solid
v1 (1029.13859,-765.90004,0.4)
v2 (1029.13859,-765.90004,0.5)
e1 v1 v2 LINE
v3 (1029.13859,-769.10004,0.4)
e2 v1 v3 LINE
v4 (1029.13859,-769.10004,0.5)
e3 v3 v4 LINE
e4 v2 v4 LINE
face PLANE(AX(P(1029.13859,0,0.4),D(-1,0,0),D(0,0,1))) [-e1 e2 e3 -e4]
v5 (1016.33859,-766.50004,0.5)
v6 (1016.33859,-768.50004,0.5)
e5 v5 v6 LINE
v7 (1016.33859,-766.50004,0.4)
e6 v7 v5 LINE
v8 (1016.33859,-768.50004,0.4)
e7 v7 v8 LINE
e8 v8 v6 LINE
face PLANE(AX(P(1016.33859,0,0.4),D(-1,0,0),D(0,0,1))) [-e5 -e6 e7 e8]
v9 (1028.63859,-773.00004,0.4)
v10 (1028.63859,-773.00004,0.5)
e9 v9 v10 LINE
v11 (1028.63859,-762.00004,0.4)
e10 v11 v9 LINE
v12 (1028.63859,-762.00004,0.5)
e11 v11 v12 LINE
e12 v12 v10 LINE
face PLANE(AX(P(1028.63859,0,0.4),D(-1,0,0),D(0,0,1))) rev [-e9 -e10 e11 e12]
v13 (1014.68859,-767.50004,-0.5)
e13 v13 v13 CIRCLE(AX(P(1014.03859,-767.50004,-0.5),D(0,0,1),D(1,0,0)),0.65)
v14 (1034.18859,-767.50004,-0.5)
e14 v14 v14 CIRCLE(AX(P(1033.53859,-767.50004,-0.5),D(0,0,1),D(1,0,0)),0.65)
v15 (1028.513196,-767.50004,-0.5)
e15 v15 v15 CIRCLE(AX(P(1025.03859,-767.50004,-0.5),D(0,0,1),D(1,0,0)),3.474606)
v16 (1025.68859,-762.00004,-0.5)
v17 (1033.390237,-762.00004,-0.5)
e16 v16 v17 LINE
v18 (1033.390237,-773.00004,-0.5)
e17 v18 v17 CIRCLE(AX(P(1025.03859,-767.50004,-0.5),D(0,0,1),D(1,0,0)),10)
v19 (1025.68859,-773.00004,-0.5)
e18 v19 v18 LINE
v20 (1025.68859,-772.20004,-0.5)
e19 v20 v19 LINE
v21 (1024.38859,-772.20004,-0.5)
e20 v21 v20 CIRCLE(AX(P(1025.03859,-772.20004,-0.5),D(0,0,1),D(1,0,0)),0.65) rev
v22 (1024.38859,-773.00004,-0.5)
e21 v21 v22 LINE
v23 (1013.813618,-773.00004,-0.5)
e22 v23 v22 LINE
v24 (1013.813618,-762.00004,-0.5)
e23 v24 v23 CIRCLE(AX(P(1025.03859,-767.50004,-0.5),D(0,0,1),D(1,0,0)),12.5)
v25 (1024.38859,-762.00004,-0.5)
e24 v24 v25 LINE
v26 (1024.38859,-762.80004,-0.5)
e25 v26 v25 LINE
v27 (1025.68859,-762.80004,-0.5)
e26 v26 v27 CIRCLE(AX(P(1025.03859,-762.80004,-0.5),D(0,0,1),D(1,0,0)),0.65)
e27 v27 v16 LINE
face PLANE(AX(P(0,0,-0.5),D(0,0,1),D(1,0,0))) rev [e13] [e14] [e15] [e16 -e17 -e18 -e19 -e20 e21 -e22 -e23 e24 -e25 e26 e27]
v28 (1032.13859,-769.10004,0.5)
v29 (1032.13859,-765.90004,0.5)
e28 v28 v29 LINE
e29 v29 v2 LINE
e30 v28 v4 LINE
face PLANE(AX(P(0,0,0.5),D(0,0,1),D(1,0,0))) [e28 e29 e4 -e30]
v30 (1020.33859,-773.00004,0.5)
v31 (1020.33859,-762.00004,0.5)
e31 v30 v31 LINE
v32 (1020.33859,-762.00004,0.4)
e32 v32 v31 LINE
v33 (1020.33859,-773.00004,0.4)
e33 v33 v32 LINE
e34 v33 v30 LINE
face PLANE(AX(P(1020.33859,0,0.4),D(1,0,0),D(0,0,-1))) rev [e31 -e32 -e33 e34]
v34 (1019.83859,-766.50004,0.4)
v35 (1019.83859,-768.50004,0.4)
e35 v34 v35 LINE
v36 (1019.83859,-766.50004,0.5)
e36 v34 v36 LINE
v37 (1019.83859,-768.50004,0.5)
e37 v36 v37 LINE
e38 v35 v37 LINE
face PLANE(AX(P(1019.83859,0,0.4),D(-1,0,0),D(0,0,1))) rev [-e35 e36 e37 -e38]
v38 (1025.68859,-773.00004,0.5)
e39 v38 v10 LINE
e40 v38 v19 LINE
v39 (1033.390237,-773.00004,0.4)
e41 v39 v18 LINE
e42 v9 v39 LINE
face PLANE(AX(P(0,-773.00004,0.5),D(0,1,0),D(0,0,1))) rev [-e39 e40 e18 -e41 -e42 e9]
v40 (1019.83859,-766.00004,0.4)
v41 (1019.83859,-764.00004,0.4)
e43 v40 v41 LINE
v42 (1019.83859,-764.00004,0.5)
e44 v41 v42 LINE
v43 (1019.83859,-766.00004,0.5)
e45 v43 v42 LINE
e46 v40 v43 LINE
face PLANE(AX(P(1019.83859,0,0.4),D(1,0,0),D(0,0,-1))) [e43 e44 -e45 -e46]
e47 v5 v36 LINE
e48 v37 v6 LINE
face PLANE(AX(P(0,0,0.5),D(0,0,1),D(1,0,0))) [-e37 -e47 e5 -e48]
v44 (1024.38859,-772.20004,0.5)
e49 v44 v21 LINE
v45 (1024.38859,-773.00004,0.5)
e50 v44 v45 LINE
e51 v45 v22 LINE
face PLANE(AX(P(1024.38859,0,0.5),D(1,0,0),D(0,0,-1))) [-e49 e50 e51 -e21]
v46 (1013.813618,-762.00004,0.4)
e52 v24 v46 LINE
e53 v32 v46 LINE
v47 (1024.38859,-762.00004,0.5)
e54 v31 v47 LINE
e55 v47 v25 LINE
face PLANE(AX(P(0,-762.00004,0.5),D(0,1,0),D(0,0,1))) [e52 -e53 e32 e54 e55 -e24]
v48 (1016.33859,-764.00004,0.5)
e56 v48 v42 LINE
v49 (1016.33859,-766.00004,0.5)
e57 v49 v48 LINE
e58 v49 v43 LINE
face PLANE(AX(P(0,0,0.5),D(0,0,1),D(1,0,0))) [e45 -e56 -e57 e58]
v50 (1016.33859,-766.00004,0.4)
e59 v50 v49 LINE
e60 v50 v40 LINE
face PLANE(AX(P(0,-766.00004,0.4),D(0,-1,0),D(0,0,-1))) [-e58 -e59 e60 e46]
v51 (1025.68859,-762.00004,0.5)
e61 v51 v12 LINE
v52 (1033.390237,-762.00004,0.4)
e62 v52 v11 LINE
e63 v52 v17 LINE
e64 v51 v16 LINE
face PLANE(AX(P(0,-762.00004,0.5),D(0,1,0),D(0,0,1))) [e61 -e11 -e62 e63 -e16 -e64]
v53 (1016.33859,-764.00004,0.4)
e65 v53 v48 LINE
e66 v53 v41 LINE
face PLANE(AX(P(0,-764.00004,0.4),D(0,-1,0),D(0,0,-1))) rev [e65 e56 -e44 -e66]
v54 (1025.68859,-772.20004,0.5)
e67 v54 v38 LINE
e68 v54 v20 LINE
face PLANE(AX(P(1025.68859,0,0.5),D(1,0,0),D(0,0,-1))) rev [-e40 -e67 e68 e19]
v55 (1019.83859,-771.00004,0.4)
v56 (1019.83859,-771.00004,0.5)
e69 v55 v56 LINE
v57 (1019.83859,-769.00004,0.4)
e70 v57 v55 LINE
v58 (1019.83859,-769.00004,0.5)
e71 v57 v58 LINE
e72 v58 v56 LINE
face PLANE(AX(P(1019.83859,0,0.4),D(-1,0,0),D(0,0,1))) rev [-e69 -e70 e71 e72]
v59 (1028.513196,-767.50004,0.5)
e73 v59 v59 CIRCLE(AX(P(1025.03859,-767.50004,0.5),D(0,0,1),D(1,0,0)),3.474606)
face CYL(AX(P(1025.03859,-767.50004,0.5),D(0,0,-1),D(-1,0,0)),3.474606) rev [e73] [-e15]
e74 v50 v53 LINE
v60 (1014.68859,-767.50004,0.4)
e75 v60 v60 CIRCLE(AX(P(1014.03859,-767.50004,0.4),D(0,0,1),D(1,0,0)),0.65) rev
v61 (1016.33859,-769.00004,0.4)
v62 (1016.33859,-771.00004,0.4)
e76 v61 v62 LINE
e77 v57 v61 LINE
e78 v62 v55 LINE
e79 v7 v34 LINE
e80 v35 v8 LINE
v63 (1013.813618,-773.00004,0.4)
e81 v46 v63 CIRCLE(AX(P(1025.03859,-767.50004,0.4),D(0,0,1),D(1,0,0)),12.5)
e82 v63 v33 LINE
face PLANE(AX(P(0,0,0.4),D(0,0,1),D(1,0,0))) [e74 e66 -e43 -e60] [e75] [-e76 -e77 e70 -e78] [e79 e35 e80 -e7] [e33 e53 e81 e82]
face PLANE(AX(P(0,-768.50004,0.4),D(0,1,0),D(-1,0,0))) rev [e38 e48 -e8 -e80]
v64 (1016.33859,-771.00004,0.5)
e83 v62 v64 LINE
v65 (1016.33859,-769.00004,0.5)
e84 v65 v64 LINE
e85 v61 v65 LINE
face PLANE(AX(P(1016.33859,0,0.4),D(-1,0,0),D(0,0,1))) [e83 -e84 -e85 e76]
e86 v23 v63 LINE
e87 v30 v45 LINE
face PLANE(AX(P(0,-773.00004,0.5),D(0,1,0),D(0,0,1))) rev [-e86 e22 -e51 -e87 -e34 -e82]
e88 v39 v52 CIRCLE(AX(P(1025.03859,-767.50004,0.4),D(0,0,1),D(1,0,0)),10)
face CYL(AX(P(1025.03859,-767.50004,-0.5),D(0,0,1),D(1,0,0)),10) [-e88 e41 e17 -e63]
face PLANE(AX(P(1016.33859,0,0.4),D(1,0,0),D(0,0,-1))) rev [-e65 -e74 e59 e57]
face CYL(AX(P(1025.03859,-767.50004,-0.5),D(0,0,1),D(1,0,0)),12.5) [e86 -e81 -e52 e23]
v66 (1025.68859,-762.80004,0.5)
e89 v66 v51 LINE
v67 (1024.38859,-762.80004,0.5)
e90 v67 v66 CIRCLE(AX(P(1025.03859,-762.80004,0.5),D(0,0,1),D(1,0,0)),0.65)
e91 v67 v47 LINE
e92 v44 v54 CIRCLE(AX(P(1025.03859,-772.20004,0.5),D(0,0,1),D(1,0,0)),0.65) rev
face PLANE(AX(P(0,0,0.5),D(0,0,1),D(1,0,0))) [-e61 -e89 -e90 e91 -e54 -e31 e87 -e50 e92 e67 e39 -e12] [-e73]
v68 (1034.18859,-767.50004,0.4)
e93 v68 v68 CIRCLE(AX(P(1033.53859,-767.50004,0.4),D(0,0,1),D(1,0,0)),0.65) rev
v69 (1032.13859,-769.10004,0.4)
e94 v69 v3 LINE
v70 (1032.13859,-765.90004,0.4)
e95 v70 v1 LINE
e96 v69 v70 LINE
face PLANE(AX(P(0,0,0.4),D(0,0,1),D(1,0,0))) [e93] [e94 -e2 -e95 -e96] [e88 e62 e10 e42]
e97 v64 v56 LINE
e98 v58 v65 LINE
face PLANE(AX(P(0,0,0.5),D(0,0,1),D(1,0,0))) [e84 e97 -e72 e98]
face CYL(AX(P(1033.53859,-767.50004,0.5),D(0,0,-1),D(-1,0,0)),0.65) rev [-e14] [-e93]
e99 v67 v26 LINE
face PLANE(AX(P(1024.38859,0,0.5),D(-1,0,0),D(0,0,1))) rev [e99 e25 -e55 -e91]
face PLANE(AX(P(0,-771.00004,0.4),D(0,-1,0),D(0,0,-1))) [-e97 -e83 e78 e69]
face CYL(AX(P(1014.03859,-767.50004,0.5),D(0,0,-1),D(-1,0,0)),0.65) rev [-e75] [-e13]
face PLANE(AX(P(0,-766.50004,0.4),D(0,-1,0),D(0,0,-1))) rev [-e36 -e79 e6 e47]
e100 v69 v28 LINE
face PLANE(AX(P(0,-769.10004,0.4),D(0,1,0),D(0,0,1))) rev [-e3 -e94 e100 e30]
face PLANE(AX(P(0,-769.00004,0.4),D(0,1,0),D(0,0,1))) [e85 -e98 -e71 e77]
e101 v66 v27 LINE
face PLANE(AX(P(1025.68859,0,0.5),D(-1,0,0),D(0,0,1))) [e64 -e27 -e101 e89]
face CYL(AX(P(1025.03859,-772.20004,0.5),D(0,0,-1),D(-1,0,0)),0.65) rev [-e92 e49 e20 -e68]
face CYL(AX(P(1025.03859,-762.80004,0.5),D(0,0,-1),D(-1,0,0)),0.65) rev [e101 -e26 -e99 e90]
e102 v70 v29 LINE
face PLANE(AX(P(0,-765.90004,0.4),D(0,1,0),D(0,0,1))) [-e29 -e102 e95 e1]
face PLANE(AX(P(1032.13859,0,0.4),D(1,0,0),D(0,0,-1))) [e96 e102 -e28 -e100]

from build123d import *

# Parameters (mm, degrees)
MODEL_R         = 0.65
MODEL_R_2       = 3.4746057
EXTRUDE_1_DEPTH = 0.5
EXTRUDE2_START  = -0.1
SKETCH2_R       = 0.65
SKETCH2_W       = 3.5
SKETCH2_H       = 2
EXTRUDE2_DEPTH  = 0.1
EXTRUDE1_START  = -0.5
EXTRUDE1_DEPTH  = 0.9


# Read off the part's stored shape, not the designer's step: Extrude1
with BuildPart() as part:
    # Model → Бобышка-Вытянуть1 (new, symmetric)
    with BuildSketch(Plane.XY):
        with BuildLine():
            Line((1024.38859, -762.8000398), (1024.38859, -762.0000398))
            Line((1024.38859, -762.0000398), (1012.53859, -762.0000398))
            Line((1012.53859, -762.0000398), (1012.53859, -773.0000398))
            Line((1012.53859, -773.0000398), (1024.38859, -773.0000398))
            Line((1024.38859, -773.0000398), (1024.38859, -772.2000398))
            ThreePointArc((1024.38859, -772.2000398), (1025.03859, -771.5500398), (1025.68859, -772.2000398))
            Line((1025.68859, -772.2000398), (1025.68859, -773.0000398))
            Line((1025.68859, -773.0000398), (1035.03859, -773.0000398))
            Line((1035.03859, -773.0000398), (1035.03859, -762.0000398))
            Line((1035.03859, -762.0000398), (1025.68859, -762.0000398))
            Line((1025.68859, -762.0000398), (1025.68859, -762.8000398))
            ThreePointArc((1025.68859, -762.8000398), (1025.03859, -763.4500398), (1024.38859, -762.8000398))
        make_face()
        with Locations((1033.53859, -767.5000398)):
            Circle(MODEL_R, mode=Mode.SUBTRACT)
        with Locations((1025.03859, -767.5000398)):
            Circle(MODEL_R_2, mode=Mode.SUBTRACT)
        with Locations((1014.03859, -767.5000398)):
            Circle(MODEL_R, mode=Mode.SUBTRACT)
    extrude(amount=EXTRUDE_1_DEPTH, both=True)

    # Sketch2 → Extrude2 (cut)
    # profile 1 of 2: a face of its own
    with BuildSketch(Plane.XY.offset(0.5).offset(EXTRUDE2_START)):
        Polygon((1020.33859, -764.0000398), (1020.33859, -762.0000398), (1012.53859, -762.0000398), (1012.53859, -773.0000398), (1020.33859, -773.0000398), (1020.33859, -771.0000398), (1020.33859, -769.0000398), (1020.33859, -766.0000398), align=None)
        with Locations((1014.03859, -767.5000398)):
            Circle(SKETCH2_R, mode=Mode.SUBTRACT)
        Polygon((1016.33859, -770.1000398), (1016.33859, -769.0000398), (1019.83859, -769.0000398), (1019.83859, -771.0000398), (1016.33859, -771.0000398), align=None, mode=Mode.SUBTRACT)
        with Locations((1018.08859, -767.5000398)):
            Rectangle(SKETCH2_W, SKETCH2_H, mode=Mode.SUBTRACT)
        Polygon((1019.83859, -764.0000398), (1019.83859, -766.0000398), (1016.33859, -766.0000398), (1016.33859, -764.9000398), (1016.33859, -764.0000398), align=None, mode=Mode.SUBTRACT)
    # profile 2 of 2: a face of its own
    with BuildSketch(Plane.XY.offset(0.5).offset(EXTRUDE2_START)):
        Polygon((1035.03859, -762.0000398), (1028.63859, -762.0000398), (1028.63859, -767.5000398), (1028.63859, -773.0000398), (1035.03859, -773.0000398), align=None)
        with Locations((1033.53859, -767.5000398)):
            Circle(SKETCH2_R, mode=Mode.SUBTRACT)
        Polygon((1029.13859, -769.1000398), (1029.13859, -767.5000398), (1029.13859, -765.9000398), (1032.13859, -765.9000398), (1032.13859, -767.5000398), (1032.13859, -769.1000398), align=None, mode=Mode.SUBTRACT)
    extrude(amount=EXTRUDE2_DEPTH, mode=Mode.SUBTRACT)

    # Extrude1 outline → Extrude1 (cut)
    with BuildSketch(Plane.XY.offset(EXTRUDE1_START)):
        with BuildLine():
            ThreePointArc((1013.81361784, -773.0000398), (1012.861518267, -770.322968067), (1012.53859, -767.5000398))
            Line((1012.53859, -767.5000398), (1012.53859, -773.0000398))
            Line((1012.53859, -773.0000398), (1013.81361784, -773.0000398))
        make_face()
        with BuildLine():
            ThreePointArc((1012.53859, -767.5000398), (1012.861518267, -764.677111533), (1013.81361784, -762.0000398))
            Line((1013.81361784, -762.0000398), (1012.53859, -762.0000398))
            Line((1012.53859, -762.0000398), (1012.53859, -767.5000398))
        make_face()
        with BuildLine():
            ThreePointArc((1033.390236544, -762.0000398), (1034.617641765, -764.629191967), (1035.03859, -767.5000398))
            Line((1035.03859, -767.5000398), (1035.03859, -762.0000398))
            Line((1035.03859, -762.0000398), (1033.390236544, -762.0000398))
        make_face()
        with BuildLine():
            ThreePointArc((1035.03859, -767.5000398), (1034.617641765, -770.370887633), (1033.390236544, -773.0000398))
            Line((1033.390236544, -773.0000398), (1035.03859, -773.0000398))
            Line((1035.03859, -773.0000398), (1035.03859, -767.5000398))
        make_face()
    extrude(amount=EXTRUDE1_DEPTH, mode=Mode.SUBTRACT)


solid = part.part
